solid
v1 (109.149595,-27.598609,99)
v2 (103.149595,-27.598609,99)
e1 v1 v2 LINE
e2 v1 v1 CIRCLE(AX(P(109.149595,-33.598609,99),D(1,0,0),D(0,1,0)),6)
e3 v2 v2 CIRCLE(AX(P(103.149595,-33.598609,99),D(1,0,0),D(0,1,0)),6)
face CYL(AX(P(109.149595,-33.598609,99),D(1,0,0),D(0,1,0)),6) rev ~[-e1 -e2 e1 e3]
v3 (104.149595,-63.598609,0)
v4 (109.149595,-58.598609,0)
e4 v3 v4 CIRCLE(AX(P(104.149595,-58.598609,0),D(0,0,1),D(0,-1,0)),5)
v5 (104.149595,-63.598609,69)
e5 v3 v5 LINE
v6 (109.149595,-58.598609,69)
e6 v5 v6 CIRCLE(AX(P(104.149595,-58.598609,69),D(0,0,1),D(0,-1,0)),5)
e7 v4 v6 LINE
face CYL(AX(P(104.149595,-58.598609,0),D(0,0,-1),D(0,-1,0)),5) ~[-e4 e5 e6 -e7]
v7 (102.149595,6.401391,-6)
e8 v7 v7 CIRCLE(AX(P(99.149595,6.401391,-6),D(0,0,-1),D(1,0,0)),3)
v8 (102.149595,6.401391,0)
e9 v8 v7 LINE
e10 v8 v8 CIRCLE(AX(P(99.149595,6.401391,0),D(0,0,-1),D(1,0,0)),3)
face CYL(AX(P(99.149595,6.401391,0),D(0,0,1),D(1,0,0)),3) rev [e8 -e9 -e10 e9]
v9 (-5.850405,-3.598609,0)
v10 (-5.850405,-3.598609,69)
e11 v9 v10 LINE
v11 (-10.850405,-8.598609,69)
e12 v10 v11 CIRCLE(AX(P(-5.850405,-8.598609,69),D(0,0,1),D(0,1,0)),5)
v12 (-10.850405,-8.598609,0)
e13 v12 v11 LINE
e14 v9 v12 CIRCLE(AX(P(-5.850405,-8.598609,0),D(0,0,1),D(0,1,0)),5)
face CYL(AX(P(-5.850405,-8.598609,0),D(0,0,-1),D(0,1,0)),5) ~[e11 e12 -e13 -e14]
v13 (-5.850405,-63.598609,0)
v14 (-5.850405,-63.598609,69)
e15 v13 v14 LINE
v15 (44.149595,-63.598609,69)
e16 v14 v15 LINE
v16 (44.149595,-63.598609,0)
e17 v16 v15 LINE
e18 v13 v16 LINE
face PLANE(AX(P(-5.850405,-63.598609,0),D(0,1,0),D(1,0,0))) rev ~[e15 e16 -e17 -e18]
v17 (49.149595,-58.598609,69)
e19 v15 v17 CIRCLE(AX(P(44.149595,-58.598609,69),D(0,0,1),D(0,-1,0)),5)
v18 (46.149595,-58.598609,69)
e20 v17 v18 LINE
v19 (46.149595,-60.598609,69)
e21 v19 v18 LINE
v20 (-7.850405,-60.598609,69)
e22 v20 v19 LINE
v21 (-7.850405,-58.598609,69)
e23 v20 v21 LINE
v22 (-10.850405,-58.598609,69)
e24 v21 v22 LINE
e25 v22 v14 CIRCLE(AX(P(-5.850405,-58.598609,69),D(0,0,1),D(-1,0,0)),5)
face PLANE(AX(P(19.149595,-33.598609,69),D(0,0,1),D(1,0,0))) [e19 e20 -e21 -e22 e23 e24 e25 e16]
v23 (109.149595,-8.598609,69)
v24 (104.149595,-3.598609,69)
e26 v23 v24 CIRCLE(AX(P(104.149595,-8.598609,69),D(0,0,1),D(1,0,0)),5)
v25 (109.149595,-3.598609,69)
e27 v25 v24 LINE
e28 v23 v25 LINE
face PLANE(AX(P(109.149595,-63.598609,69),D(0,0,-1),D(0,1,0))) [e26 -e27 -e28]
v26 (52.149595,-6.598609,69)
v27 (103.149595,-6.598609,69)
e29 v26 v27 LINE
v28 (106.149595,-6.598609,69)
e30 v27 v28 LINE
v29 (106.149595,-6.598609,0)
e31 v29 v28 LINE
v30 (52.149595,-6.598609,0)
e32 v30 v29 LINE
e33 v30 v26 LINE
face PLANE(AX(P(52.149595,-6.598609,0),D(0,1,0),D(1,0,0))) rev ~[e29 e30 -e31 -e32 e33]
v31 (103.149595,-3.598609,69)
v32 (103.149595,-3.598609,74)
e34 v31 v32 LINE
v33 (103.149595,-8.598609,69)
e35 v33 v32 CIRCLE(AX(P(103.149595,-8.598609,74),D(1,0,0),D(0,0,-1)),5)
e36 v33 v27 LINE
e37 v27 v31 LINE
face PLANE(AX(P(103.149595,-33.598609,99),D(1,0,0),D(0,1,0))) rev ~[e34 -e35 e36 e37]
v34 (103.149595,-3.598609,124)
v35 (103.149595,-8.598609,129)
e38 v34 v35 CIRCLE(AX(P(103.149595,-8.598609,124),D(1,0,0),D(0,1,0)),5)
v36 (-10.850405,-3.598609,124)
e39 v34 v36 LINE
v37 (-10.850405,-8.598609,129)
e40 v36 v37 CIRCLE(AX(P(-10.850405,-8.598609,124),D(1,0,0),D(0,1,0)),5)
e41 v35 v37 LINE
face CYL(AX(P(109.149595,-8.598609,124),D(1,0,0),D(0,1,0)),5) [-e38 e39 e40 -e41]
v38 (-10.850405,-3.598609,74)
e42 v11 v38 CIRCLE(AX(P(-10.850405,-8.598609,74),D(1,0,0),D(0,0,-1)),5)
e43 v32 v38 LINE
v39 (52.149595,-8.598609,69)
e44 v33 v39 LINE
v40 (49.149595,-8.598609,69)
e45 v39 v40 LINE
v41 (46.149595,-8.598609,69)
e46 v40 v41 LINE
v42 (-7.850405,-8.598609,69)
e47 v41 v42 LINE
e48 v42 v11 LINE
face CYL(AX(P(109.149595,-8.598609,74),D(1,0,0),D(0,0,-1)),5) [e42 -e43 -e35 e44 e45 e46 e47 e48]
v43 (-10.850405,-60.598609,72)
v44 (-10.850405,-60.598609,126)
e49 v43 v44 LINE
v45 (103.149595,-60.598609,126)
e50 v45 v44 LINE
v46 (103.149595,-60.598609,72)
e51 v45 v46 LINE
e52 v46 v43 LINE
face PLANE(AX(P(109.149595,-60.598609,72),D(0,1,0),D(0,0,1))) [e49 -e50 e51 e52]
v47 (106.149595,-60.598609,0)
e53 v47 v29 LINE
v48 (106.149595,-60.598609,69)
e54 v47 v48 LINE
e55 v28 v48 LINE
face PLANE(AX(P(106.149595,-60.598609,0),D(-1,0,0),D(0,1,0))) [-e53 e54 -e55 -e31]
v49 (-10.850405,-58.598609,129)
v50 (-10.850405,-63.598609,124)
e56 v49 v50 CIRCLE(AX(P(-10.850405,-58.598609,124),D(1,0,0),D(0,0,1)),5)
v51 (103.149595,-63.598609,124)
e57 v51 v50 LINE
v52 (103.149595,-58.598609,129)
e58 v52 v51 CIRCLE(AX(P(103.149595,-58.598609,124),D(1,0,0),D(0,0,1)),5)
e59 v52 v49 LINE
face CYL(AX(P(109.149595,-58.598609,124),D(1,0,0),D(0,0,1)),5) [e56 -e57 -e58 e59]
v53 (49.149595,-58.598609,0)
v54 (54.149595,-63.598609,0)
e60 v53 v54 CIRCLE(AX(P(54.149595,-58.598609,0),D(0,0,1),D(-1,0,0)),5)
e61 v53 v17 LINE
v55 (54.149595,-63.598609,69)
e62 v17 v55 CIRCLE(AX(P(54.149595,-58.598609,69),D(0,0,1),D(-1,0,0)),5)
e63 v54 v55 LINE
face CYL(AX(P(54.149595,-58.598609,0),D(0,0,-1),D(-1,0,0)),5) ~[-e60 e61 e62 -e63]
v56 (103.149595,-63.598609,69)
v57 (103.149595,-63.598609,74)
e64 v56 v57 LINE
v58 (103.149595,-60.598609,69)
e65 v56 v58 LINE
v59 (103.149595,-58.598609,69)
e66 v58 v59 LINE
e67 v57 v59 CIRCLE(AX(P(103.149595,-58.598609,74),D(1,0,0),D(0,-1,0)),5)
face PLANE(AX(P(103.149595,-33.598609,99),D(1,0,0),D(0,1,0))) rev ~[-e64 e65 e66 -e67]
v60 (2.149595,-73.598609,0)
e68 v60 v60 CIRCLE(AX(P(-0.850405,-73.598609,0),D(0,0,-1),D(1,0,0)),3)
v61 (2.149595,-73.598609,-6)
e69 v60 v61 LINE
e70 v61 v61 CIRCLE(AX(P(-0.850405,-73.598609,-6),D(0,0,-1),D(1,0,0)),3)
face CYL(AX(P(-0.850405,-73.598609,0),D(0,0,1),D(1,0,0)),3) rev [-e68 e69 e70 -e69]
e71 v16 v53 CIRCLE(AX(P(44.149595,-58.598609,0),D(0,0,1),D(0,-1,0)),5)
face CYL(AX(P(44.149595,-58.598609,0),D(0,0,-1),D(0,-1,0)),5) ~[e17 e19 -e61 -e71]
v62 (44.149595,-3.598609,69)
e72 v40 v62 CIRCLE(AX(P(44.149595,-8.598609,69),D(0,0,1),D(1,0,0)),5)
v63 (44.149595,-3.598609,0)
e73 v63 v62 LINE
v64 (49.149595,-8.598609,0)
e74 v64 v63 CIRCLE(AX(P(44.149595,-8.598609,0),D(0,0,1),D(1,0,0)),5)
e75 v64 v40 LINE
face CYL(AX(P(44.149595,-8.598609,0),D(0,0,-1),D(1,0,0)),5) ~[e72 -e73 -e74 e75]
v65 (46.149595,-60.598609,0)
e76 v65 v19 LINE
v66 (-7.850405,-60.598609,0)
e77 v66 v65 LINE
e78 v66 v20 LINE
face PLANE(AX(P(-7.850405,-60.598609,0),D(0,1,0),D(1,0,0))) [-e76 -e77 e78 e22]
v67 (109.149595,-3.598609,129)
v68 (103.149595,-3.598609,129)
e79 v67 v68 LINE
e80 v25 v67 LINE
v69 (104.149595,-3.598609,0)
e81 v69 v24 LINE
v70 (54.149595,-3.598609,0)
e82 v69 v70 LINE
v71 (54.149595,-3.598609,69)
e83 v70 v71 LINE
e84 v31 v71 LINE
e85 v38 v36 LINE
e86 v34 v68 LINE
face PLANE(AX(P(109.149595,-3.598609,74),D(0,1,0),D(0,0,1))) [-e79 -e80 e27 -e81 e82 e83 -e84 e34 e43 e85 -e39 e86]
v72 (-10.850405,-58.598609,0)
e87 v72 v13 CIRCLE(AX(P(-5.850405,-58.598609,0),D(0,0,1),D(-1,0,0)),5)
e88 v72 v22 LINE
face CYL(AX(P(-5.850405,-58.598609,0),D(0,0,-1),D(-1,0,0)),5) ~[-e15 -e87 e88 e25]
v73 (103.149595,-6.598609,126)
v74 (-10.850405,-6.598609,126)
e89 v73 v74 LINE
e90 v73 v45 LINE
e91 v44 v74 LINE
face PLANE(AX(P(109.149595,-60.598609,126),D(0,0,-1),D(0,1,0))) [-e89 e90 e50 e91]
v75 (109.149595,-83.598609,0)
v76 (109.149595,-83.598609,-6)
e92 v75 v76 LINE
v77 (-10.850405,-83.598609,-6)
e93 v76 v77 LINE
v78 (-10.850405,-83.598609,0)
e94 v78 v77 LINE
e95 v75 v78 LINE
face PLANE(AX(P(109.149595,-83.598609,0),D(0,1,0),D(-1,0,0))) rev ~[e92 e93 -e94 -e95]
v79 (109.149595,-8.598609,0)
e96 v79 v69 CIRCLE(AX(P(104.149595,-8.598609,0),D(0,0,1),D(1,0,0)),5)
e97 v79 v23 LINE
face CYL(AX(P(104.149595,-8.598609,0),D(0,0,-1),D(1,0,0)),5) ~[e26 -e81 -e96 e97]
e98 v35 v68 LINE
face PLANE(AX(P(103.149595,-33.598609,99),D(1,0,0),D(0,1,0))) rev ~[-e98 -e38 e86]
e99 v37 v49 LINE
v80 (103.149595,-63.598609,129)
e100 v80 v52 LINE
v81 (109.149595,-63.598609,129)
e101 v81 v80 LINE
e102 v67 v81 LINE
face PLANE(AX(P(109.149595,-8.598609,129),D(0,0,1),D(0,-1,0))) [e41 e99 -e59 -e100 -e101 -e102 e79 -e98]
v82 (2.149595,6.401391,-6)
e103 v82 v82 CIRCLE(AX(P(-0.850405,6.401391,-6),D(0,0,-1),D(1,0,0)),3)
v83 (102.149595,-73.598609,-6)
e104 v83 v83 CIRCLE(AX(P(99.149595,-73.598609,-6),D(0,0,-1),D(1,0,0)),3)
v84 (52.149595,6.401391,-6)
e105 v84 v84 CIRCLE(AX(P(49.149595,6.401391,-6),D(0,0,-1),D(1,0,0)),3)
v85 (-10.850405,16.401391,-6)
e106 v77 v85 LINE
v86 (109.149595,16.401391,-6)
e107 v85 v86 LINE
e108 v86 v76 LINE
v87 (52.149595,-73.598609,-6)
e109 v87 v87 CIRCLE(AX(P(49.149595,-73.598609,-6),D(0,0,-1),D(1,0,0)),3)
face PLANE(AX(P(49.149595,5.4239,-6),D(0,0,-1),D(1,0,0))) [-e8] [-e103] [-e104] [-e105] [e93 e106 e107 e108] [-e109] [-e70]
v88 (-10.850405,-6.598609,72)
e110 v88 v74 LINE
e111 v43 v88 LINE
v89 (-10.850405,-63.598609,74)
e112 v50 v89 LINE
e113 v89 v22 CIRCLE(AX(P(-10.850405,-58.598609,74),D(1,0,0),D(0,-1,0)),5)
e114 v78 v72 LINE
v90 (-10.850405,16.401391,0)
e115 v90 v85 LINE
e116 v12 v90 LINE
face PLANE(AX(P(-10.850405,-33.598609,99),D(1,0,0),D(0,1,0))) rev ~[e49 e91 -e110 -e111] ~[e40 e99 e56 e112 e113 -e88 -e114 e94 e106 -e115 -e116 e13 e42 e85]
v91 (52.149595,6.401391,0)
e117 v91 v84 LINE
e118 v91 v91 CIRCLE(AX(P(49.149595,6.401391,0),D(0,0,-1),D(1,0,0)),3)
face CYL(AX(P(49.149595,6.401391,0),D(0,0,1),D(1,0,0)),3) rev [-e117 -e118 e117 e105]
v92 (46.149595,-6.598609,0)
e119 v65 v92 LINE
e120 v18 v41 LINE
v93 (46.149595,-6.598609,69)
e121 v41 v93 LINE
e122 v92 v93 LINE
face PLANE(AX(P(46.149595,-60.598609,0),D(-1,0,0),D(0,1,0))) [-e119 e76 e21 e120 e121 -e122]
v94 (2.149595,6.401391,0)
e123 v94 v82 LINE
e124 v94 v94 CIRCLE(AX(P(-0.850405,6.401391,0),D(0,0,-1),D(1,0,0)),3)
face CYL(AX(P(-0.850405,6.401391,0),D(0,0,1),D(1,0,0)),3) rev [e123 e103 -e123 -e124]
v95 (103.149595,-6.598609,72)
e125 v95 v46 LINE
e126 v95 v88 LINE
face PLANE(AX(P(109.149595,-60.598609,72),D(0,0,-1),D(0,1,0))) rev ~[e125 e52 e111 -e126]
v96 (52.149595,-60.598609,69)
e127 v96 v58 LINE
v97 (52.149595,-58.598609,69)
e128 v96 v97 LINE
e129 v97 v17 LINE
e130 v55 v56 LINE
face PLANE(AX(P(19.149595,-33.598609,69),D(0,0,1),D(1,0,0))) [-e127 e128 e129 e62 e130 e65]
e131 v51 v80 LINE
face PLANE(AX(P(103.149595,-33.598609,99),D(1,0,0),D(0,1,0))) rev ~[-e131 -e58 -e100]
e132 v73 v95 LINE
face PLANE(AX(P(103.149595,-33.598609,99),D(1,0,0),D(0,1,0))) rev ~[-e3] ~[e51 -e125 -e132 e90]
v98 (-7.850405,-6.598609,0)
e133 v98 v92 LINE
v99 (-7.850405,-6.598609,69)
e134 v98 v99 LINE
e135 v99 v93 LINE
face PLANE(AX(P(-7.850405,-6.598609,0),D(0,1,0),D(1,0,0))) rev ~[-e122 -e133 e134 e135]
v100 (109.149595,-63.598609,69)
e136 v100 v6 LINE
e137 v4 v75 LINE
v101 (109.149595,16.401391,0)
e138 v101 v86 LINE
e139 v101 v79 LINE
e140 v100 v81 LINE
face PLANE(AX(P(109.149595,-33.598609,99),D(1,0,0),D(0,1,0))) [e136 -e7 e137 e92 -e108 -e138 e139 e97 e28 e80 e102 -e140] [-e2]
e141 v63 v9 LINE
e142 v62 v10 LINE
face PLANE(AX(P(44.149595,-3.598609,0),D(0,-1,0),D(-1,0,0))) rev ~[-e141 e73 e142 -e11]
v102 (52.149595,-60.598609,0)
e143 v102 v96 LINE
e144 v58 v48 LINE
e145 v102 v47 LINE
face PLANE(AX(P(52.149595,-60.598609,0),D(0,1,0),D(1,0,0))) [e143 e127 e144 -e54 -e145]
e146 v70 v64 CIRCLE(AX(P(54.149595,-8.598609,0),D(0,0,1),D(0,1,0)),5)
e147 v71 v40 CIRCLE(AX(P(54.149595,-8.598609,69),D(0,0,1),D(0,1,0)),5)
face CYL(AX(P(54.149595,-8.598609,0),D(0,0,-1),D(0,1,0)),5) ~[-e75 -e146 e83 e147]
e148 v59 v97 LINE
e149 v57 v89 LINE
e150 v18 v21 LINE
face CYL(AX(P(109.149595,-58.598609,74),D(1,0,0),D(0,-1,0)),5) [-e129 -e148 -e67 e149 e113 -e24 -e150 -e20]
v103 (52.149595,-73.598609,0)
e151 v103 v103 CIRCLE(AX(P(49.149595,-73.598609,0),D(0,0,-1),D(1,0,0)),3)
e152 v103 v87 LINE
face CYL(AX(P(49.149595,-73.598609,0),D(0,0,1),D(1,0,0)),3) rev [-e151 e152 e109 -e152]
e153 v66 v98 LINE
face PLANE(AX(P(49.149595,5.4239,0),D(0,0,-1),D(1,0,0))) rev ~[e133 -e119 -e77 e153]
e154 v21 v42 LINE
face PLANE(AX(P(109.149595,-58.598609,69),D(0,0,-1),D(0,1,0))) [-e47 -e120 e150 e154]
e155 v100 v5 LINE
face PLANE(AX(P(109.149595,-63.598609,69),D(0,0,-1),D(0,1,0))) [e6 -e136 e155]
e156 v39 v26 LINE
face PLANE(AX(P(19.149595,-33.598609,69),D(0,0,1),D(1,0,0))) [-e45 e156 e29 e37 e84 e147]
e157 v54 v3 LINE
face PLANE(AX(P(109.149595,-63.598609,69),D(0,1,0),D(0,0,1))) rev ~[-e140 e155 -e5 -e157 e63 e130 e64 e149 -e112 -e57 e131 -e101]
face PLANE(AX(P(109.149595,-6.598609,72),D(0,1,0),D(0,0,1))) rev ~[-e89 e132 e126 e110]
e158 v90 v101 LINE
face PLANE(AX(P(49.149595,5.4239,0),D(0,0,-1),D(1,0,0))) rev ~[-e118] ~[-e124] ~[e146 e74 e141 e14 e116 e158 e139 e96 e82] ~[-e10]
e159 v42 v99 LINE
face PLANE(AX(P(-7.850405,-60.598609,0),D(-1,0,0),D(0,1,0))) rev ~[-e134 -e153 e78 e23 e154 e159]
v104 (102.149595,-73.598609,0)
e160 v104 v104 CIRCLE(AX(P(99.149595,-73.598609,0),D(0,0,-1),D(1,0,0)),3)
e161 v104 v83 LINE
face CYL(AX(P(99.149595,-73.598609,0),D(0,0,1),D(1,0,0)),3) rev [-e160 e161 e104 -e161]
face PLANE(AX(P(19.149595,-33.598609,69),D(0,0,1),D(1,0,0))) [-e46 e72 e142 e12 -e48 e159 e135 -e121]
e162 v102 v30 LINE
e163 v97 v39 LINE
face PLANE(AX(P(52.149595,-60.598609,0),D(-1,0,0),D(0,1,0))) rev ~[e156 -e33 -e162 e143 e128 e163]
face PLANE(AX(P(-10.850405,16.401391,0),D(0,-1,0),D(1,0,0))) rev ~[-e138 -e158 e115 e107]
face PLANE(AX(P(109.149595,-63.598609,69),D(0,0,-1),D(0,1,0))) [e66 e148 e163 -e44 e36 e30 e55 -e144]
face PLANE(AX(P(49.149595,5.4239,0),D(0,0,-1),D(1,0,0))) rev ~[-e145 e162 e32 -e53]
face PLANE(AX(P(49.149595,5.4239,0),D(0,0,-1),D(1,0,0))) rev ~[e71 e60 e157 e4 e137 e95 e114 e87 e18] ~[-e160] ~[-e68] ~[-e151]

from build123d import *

# Parameters (mm, degrees)
F0_W     = 54
F0_H     = 54
F1_DEPTH = 69
F2_R     = 3
F2_W     = 54
F2_H     = 54
F3_DEPTH = 6
F4_W     = 54
F4_H     = 54
F5_DEPTH = 120
F6_W     = 60
F6_H     = 60
F6_R     = 6
F7_DEPTH = 6


with BuildPart() as f1:
    # F0 (on Top) → F1 (new body)
    with BuildSketch(Plane.XY):
        with BuildLine():
            ThreePointArc((-5.85040465, -3.5986092687), (-9.3859385559, -5.0630753627), (-10.85040465, -8.5986092687))
            Line((-10.85040465, -8.5986092687), (-10.85040465, -58.5986092687))
            ThreePointArc((-10.85040465, -58.5986092687), (-9.3859385559, -62.1341431746), (-5.85040465, -63.5986092687))
            Line((-5.85040465, -63.5986092687), (44.14959535, -63.5986092687))
            ThreePointArc((44.14959535, -63.5986092687), (47.685129256, -62.1341431746), (49.14959535, -58.5986092687))
            Line((49.14959535, -58.5986092687), (49.14959535, -8.5986092687))
            ThreePointArc((49.14959535, -8.5986092687), (47.685129256, -5.0630753627), (44.14959535, -3.5986092687))
            Line((44.14959535, -3.5986092687), (-5.85040465, -3.5986092687))
        make_face()
        with Locations((19.14959535, -33.5986092687)):
            Rectangle(F0_W, F0_H, mode=Mode.SUBTRACT)
        with BuildLine():
            ThreePointArc((54.14959535, -3.5986092687), (50.6140614441, -5.0630753627), (49.14959535, -8.5986092687))
            Line((49.14959535, -8.5986092687), (49.14959535, -58.5986092687))
            ThreePointArc((49.14959535, -58.5986092687), (50.6140614441, -62.1341431746), (54.14959535, -63.5986092687))
            Line((54.14959535, -63.5986092687), (104.14959535, -63.5986092687))
            ThreePointArc((104.14959535, -63.5986092687), (107.685129256, -62.1341431746), (109.14959535, -58.5986092687))
            Line((109.14959535, -58.5986092687), (109.14959535, -8.5986092687))
            ThreePointArc((109.14959535, -8.5986092687), (107.685129256, -5.0630753627), (104.14959535, -3.5986092687))
            Line((104.14959535, -3.5986092687), (54.14959535, -3.5986092687))
        make_face()
        with Locations((79.14959535, -33.5986092687)):
            Rectangle(F0_W, F0_H, mode=Mode.SUBTRACT)
    extrude(amount=F1_DEPTH)

    # F2 (on face) → F3 (join)
    with BuildSketch(Plane(origin=(0, 0, 0), x_dir=(1, 0, 0), z_dir=(0, 0, -1))):
        with BuildLine():
            Line((-10.85040465, -16.4013907313), (109.14959535, -16.4013907313))
            Line((109.14959535, -16.4013907313), (109.14959535, 8.5986092687))
            ThreePointArc((109.14959535, 8.5986092687), (107.685129256, 5.0630753627), (104.14959535, 3.5986092687))
            Line((104.14959535, 3.5986092687), (54.14959535, 3.5986092687))
            ThreePointArc((54.14959535, 3.5986092687), (50.6140614441, 5.0630753627), (49.14959535, 8.5986092687))
            ThreePointArc((49.14959535, 8.5986092687), (47.685129256, 5.0630753627), (44.14959535, 3.5986092687))
            Line((44.14959535, 3.5986092687), (-5.85040465, 3.5986092687))
            ThreePointArc((-5.85040465, 3.5986092687), (-9.3859385559, 5.0630753627), (-10.85040465, 8.5986092687))
            Line((-10.85040465, 8.5986092687), (-10.85040465, -16.4013907313))
        make_face()
        with Locations((-0.85040465, -6.4013907313)):
            Circle(F2_R, mode=Mode.SUBTRACT)
        with Locations((49.14959535, -6.4013907313)):
            Circle(F2_R, mode=Mode.SUBTRACT)
        with Locations((99.14959535, -6.4013907313)):
            Circle(F2_R, mode=Mode.SUBTRACT)
        with BuildLine():
            ThreePointArc((104.14959535, 63.5986092687), (107.685129256, 62.1341431746), (109.14959535, 58.5986092687))
            Line((109.14959535, 58.5986092687), (109.14959535, 83.5986092687))
            Line((109.14959535, 83.5986092687), (-10.85040465, 83.5986092687))
            Line((-10.85040465, 83.5986092687), (-10.85040465, 58.5986092687))
            ThreePointArc((-10.85040465, 58.5986092687), (-9.3859385559, 62.1341431746), (-5.85040465, 63.5986092687))
            Line((-5.85040465, 63.5986092687), (44.14959535, 63.5986092687))
            ThreePointArc((44.14959535, 63.5986092687), (47.685129256, 62.1341431746), (49.14959535, 58.5986092687))
            ThreePointArc((49.14959535, 58.5986092687), (50.6140614441, 62.1341431746), (54.14959535, 63.5986092687))
            Line((54.14959535, 63.5986092687), (104.14959535, 63.5986092687))
        make_face()
        with Locations((-0.85040465, 73.5986092687)):
            Circle(F2_R, mode=Mode.SUBTRACT)
        with Locations((49.14959535, 73.5986092687)):
            Circle(F2_R, mode=Mode.SUBTRACT)
        with Locations((99.14959535, 73.5986092687)):
            Circle(F2_R, mode=Mode.SUBTRACT)
        with BuildLine():
            ThreePointArc((104.14959535, 3.5986092687), (107.685129256, 5.0630753627), (109.14959535, 8.5986092687))
            Line((109.14959535, 8.5986092687), (109.14959535, 58.5986092687))
            ThreePointArc((109.14959535, 58.5986092687), (107.685129256, 62.1341431746), (104.14959535, 63.5986092687))
            Line((104.14959535, 63.5986092687), (54.14959535, 63.5986092687))
            ThreePointArc((54.14959535, 63.5986092687), (50.6140614441, 62.1341431746), (49.14959535, 58.5986092687))
            ThreePointArc((49.14959535, 58.5986092687), (47.685129256, 62.1341431746), (44.14959535, 63.5986092687))
            Line((44.14959535, 63.5986092687), (-5.85040465, 63.5986092687))
            ThreePointArc((-5.85040465, 63.5986092687), (-9.3859385559, 62.1341431746), (-10.85040465, 58.5986092687))
            Line((-10.85040465, 58.5986092687), (-10.85040465, 8.5986092687))
            ThreePointArc((-10.85040465, 8.5986092687), (-9.3859385559, 5.0630753627), (-5.85040465, 3.5986092687))
            Line((-5.85040465, 3.5986092687), (44.14959535, 3.5986092687))
            ThreePointArc((44.14959535, 3.5986092687), (47.685129256, 5.0630753627), (49.14959535, 8.5986092687))
            ThreePointArc((49.14959535, 8.5986092687), (50.6140614441, 5.0630753627), (54.14959535, 3.5986092687))
            Line((54.14959535, 3.5986092687), (104.14959535, 3.5986092687))
        make_face()
        with Locations((19.14959535, 33.5986092687)):
            Rectangle(F2_W, F2_H, mode=Mode.SUBTRACT)
        with Locations((79.14959535, 33.5986092687)):
            Rectangle(F2_W, F2_H, mode=Mode.SUBTRACT)
        with Locations((19.14959535, 33.5986092687)):
            Rectangle(F2_W, F2_H)
        with Locations((79.14959535, 33.5986092687)):
            Rectangle(F2_W, F2_H)
    extrude(amount=F3_DEPTH)

    # F4 (on face) → F5 (join, through all)
    with BuildSketch(Plane.YZ.offset(109.14959535)):
        with BuildLine():
            ThreePointArc((-3.5986092687, 124), (-5.0630753627, 127.5355339059), (-8.5986092687, 129))
            Line((-8.5986092687, 129), (-58.5986092687, 129))
            ThreePointArc((-58.5986092687, 129), (-62.1341431746, 127.5355339059), (-63.5986092687, 124))
            Line((-63.5986092687, 124), (-63.5986092687, 74))
            ThreePointArc((-63.5986092687, 74), (-62.1341431746, 70.4644660941), (-58.5986092687, 69))
            Line((-58.5986092687, 69), (-8.5986092687, 69))
            ThreePointArc((-8.5986092687, 69), (-5.0630753627, 70.4644660941), (-3.5986092687, 74))
            Line((-3.5986092687, 74), (-3.5986092687, 124))
        make_face()
        with Locations((-33.5986092687, 99)):
            Rectangle(F4_W, F4_H, mode=Mode.SUBTRACT)
    extrude(amount=-F5_DEPTH)

    # F6 (on face) → F7 (join)
    with BuildSketch(Plane.YZ.offset(109.14959535)):
        with Locations((-33.5986092687, 99)):
            Rectangle(F6_W, F6_H)
        with Locations((-33.5986092687, 99)):
            Circle(F6_R, mode=Mode.SUBTRACT)
    extrude(amount=-F7_DEPTH)


solid = f1.part
